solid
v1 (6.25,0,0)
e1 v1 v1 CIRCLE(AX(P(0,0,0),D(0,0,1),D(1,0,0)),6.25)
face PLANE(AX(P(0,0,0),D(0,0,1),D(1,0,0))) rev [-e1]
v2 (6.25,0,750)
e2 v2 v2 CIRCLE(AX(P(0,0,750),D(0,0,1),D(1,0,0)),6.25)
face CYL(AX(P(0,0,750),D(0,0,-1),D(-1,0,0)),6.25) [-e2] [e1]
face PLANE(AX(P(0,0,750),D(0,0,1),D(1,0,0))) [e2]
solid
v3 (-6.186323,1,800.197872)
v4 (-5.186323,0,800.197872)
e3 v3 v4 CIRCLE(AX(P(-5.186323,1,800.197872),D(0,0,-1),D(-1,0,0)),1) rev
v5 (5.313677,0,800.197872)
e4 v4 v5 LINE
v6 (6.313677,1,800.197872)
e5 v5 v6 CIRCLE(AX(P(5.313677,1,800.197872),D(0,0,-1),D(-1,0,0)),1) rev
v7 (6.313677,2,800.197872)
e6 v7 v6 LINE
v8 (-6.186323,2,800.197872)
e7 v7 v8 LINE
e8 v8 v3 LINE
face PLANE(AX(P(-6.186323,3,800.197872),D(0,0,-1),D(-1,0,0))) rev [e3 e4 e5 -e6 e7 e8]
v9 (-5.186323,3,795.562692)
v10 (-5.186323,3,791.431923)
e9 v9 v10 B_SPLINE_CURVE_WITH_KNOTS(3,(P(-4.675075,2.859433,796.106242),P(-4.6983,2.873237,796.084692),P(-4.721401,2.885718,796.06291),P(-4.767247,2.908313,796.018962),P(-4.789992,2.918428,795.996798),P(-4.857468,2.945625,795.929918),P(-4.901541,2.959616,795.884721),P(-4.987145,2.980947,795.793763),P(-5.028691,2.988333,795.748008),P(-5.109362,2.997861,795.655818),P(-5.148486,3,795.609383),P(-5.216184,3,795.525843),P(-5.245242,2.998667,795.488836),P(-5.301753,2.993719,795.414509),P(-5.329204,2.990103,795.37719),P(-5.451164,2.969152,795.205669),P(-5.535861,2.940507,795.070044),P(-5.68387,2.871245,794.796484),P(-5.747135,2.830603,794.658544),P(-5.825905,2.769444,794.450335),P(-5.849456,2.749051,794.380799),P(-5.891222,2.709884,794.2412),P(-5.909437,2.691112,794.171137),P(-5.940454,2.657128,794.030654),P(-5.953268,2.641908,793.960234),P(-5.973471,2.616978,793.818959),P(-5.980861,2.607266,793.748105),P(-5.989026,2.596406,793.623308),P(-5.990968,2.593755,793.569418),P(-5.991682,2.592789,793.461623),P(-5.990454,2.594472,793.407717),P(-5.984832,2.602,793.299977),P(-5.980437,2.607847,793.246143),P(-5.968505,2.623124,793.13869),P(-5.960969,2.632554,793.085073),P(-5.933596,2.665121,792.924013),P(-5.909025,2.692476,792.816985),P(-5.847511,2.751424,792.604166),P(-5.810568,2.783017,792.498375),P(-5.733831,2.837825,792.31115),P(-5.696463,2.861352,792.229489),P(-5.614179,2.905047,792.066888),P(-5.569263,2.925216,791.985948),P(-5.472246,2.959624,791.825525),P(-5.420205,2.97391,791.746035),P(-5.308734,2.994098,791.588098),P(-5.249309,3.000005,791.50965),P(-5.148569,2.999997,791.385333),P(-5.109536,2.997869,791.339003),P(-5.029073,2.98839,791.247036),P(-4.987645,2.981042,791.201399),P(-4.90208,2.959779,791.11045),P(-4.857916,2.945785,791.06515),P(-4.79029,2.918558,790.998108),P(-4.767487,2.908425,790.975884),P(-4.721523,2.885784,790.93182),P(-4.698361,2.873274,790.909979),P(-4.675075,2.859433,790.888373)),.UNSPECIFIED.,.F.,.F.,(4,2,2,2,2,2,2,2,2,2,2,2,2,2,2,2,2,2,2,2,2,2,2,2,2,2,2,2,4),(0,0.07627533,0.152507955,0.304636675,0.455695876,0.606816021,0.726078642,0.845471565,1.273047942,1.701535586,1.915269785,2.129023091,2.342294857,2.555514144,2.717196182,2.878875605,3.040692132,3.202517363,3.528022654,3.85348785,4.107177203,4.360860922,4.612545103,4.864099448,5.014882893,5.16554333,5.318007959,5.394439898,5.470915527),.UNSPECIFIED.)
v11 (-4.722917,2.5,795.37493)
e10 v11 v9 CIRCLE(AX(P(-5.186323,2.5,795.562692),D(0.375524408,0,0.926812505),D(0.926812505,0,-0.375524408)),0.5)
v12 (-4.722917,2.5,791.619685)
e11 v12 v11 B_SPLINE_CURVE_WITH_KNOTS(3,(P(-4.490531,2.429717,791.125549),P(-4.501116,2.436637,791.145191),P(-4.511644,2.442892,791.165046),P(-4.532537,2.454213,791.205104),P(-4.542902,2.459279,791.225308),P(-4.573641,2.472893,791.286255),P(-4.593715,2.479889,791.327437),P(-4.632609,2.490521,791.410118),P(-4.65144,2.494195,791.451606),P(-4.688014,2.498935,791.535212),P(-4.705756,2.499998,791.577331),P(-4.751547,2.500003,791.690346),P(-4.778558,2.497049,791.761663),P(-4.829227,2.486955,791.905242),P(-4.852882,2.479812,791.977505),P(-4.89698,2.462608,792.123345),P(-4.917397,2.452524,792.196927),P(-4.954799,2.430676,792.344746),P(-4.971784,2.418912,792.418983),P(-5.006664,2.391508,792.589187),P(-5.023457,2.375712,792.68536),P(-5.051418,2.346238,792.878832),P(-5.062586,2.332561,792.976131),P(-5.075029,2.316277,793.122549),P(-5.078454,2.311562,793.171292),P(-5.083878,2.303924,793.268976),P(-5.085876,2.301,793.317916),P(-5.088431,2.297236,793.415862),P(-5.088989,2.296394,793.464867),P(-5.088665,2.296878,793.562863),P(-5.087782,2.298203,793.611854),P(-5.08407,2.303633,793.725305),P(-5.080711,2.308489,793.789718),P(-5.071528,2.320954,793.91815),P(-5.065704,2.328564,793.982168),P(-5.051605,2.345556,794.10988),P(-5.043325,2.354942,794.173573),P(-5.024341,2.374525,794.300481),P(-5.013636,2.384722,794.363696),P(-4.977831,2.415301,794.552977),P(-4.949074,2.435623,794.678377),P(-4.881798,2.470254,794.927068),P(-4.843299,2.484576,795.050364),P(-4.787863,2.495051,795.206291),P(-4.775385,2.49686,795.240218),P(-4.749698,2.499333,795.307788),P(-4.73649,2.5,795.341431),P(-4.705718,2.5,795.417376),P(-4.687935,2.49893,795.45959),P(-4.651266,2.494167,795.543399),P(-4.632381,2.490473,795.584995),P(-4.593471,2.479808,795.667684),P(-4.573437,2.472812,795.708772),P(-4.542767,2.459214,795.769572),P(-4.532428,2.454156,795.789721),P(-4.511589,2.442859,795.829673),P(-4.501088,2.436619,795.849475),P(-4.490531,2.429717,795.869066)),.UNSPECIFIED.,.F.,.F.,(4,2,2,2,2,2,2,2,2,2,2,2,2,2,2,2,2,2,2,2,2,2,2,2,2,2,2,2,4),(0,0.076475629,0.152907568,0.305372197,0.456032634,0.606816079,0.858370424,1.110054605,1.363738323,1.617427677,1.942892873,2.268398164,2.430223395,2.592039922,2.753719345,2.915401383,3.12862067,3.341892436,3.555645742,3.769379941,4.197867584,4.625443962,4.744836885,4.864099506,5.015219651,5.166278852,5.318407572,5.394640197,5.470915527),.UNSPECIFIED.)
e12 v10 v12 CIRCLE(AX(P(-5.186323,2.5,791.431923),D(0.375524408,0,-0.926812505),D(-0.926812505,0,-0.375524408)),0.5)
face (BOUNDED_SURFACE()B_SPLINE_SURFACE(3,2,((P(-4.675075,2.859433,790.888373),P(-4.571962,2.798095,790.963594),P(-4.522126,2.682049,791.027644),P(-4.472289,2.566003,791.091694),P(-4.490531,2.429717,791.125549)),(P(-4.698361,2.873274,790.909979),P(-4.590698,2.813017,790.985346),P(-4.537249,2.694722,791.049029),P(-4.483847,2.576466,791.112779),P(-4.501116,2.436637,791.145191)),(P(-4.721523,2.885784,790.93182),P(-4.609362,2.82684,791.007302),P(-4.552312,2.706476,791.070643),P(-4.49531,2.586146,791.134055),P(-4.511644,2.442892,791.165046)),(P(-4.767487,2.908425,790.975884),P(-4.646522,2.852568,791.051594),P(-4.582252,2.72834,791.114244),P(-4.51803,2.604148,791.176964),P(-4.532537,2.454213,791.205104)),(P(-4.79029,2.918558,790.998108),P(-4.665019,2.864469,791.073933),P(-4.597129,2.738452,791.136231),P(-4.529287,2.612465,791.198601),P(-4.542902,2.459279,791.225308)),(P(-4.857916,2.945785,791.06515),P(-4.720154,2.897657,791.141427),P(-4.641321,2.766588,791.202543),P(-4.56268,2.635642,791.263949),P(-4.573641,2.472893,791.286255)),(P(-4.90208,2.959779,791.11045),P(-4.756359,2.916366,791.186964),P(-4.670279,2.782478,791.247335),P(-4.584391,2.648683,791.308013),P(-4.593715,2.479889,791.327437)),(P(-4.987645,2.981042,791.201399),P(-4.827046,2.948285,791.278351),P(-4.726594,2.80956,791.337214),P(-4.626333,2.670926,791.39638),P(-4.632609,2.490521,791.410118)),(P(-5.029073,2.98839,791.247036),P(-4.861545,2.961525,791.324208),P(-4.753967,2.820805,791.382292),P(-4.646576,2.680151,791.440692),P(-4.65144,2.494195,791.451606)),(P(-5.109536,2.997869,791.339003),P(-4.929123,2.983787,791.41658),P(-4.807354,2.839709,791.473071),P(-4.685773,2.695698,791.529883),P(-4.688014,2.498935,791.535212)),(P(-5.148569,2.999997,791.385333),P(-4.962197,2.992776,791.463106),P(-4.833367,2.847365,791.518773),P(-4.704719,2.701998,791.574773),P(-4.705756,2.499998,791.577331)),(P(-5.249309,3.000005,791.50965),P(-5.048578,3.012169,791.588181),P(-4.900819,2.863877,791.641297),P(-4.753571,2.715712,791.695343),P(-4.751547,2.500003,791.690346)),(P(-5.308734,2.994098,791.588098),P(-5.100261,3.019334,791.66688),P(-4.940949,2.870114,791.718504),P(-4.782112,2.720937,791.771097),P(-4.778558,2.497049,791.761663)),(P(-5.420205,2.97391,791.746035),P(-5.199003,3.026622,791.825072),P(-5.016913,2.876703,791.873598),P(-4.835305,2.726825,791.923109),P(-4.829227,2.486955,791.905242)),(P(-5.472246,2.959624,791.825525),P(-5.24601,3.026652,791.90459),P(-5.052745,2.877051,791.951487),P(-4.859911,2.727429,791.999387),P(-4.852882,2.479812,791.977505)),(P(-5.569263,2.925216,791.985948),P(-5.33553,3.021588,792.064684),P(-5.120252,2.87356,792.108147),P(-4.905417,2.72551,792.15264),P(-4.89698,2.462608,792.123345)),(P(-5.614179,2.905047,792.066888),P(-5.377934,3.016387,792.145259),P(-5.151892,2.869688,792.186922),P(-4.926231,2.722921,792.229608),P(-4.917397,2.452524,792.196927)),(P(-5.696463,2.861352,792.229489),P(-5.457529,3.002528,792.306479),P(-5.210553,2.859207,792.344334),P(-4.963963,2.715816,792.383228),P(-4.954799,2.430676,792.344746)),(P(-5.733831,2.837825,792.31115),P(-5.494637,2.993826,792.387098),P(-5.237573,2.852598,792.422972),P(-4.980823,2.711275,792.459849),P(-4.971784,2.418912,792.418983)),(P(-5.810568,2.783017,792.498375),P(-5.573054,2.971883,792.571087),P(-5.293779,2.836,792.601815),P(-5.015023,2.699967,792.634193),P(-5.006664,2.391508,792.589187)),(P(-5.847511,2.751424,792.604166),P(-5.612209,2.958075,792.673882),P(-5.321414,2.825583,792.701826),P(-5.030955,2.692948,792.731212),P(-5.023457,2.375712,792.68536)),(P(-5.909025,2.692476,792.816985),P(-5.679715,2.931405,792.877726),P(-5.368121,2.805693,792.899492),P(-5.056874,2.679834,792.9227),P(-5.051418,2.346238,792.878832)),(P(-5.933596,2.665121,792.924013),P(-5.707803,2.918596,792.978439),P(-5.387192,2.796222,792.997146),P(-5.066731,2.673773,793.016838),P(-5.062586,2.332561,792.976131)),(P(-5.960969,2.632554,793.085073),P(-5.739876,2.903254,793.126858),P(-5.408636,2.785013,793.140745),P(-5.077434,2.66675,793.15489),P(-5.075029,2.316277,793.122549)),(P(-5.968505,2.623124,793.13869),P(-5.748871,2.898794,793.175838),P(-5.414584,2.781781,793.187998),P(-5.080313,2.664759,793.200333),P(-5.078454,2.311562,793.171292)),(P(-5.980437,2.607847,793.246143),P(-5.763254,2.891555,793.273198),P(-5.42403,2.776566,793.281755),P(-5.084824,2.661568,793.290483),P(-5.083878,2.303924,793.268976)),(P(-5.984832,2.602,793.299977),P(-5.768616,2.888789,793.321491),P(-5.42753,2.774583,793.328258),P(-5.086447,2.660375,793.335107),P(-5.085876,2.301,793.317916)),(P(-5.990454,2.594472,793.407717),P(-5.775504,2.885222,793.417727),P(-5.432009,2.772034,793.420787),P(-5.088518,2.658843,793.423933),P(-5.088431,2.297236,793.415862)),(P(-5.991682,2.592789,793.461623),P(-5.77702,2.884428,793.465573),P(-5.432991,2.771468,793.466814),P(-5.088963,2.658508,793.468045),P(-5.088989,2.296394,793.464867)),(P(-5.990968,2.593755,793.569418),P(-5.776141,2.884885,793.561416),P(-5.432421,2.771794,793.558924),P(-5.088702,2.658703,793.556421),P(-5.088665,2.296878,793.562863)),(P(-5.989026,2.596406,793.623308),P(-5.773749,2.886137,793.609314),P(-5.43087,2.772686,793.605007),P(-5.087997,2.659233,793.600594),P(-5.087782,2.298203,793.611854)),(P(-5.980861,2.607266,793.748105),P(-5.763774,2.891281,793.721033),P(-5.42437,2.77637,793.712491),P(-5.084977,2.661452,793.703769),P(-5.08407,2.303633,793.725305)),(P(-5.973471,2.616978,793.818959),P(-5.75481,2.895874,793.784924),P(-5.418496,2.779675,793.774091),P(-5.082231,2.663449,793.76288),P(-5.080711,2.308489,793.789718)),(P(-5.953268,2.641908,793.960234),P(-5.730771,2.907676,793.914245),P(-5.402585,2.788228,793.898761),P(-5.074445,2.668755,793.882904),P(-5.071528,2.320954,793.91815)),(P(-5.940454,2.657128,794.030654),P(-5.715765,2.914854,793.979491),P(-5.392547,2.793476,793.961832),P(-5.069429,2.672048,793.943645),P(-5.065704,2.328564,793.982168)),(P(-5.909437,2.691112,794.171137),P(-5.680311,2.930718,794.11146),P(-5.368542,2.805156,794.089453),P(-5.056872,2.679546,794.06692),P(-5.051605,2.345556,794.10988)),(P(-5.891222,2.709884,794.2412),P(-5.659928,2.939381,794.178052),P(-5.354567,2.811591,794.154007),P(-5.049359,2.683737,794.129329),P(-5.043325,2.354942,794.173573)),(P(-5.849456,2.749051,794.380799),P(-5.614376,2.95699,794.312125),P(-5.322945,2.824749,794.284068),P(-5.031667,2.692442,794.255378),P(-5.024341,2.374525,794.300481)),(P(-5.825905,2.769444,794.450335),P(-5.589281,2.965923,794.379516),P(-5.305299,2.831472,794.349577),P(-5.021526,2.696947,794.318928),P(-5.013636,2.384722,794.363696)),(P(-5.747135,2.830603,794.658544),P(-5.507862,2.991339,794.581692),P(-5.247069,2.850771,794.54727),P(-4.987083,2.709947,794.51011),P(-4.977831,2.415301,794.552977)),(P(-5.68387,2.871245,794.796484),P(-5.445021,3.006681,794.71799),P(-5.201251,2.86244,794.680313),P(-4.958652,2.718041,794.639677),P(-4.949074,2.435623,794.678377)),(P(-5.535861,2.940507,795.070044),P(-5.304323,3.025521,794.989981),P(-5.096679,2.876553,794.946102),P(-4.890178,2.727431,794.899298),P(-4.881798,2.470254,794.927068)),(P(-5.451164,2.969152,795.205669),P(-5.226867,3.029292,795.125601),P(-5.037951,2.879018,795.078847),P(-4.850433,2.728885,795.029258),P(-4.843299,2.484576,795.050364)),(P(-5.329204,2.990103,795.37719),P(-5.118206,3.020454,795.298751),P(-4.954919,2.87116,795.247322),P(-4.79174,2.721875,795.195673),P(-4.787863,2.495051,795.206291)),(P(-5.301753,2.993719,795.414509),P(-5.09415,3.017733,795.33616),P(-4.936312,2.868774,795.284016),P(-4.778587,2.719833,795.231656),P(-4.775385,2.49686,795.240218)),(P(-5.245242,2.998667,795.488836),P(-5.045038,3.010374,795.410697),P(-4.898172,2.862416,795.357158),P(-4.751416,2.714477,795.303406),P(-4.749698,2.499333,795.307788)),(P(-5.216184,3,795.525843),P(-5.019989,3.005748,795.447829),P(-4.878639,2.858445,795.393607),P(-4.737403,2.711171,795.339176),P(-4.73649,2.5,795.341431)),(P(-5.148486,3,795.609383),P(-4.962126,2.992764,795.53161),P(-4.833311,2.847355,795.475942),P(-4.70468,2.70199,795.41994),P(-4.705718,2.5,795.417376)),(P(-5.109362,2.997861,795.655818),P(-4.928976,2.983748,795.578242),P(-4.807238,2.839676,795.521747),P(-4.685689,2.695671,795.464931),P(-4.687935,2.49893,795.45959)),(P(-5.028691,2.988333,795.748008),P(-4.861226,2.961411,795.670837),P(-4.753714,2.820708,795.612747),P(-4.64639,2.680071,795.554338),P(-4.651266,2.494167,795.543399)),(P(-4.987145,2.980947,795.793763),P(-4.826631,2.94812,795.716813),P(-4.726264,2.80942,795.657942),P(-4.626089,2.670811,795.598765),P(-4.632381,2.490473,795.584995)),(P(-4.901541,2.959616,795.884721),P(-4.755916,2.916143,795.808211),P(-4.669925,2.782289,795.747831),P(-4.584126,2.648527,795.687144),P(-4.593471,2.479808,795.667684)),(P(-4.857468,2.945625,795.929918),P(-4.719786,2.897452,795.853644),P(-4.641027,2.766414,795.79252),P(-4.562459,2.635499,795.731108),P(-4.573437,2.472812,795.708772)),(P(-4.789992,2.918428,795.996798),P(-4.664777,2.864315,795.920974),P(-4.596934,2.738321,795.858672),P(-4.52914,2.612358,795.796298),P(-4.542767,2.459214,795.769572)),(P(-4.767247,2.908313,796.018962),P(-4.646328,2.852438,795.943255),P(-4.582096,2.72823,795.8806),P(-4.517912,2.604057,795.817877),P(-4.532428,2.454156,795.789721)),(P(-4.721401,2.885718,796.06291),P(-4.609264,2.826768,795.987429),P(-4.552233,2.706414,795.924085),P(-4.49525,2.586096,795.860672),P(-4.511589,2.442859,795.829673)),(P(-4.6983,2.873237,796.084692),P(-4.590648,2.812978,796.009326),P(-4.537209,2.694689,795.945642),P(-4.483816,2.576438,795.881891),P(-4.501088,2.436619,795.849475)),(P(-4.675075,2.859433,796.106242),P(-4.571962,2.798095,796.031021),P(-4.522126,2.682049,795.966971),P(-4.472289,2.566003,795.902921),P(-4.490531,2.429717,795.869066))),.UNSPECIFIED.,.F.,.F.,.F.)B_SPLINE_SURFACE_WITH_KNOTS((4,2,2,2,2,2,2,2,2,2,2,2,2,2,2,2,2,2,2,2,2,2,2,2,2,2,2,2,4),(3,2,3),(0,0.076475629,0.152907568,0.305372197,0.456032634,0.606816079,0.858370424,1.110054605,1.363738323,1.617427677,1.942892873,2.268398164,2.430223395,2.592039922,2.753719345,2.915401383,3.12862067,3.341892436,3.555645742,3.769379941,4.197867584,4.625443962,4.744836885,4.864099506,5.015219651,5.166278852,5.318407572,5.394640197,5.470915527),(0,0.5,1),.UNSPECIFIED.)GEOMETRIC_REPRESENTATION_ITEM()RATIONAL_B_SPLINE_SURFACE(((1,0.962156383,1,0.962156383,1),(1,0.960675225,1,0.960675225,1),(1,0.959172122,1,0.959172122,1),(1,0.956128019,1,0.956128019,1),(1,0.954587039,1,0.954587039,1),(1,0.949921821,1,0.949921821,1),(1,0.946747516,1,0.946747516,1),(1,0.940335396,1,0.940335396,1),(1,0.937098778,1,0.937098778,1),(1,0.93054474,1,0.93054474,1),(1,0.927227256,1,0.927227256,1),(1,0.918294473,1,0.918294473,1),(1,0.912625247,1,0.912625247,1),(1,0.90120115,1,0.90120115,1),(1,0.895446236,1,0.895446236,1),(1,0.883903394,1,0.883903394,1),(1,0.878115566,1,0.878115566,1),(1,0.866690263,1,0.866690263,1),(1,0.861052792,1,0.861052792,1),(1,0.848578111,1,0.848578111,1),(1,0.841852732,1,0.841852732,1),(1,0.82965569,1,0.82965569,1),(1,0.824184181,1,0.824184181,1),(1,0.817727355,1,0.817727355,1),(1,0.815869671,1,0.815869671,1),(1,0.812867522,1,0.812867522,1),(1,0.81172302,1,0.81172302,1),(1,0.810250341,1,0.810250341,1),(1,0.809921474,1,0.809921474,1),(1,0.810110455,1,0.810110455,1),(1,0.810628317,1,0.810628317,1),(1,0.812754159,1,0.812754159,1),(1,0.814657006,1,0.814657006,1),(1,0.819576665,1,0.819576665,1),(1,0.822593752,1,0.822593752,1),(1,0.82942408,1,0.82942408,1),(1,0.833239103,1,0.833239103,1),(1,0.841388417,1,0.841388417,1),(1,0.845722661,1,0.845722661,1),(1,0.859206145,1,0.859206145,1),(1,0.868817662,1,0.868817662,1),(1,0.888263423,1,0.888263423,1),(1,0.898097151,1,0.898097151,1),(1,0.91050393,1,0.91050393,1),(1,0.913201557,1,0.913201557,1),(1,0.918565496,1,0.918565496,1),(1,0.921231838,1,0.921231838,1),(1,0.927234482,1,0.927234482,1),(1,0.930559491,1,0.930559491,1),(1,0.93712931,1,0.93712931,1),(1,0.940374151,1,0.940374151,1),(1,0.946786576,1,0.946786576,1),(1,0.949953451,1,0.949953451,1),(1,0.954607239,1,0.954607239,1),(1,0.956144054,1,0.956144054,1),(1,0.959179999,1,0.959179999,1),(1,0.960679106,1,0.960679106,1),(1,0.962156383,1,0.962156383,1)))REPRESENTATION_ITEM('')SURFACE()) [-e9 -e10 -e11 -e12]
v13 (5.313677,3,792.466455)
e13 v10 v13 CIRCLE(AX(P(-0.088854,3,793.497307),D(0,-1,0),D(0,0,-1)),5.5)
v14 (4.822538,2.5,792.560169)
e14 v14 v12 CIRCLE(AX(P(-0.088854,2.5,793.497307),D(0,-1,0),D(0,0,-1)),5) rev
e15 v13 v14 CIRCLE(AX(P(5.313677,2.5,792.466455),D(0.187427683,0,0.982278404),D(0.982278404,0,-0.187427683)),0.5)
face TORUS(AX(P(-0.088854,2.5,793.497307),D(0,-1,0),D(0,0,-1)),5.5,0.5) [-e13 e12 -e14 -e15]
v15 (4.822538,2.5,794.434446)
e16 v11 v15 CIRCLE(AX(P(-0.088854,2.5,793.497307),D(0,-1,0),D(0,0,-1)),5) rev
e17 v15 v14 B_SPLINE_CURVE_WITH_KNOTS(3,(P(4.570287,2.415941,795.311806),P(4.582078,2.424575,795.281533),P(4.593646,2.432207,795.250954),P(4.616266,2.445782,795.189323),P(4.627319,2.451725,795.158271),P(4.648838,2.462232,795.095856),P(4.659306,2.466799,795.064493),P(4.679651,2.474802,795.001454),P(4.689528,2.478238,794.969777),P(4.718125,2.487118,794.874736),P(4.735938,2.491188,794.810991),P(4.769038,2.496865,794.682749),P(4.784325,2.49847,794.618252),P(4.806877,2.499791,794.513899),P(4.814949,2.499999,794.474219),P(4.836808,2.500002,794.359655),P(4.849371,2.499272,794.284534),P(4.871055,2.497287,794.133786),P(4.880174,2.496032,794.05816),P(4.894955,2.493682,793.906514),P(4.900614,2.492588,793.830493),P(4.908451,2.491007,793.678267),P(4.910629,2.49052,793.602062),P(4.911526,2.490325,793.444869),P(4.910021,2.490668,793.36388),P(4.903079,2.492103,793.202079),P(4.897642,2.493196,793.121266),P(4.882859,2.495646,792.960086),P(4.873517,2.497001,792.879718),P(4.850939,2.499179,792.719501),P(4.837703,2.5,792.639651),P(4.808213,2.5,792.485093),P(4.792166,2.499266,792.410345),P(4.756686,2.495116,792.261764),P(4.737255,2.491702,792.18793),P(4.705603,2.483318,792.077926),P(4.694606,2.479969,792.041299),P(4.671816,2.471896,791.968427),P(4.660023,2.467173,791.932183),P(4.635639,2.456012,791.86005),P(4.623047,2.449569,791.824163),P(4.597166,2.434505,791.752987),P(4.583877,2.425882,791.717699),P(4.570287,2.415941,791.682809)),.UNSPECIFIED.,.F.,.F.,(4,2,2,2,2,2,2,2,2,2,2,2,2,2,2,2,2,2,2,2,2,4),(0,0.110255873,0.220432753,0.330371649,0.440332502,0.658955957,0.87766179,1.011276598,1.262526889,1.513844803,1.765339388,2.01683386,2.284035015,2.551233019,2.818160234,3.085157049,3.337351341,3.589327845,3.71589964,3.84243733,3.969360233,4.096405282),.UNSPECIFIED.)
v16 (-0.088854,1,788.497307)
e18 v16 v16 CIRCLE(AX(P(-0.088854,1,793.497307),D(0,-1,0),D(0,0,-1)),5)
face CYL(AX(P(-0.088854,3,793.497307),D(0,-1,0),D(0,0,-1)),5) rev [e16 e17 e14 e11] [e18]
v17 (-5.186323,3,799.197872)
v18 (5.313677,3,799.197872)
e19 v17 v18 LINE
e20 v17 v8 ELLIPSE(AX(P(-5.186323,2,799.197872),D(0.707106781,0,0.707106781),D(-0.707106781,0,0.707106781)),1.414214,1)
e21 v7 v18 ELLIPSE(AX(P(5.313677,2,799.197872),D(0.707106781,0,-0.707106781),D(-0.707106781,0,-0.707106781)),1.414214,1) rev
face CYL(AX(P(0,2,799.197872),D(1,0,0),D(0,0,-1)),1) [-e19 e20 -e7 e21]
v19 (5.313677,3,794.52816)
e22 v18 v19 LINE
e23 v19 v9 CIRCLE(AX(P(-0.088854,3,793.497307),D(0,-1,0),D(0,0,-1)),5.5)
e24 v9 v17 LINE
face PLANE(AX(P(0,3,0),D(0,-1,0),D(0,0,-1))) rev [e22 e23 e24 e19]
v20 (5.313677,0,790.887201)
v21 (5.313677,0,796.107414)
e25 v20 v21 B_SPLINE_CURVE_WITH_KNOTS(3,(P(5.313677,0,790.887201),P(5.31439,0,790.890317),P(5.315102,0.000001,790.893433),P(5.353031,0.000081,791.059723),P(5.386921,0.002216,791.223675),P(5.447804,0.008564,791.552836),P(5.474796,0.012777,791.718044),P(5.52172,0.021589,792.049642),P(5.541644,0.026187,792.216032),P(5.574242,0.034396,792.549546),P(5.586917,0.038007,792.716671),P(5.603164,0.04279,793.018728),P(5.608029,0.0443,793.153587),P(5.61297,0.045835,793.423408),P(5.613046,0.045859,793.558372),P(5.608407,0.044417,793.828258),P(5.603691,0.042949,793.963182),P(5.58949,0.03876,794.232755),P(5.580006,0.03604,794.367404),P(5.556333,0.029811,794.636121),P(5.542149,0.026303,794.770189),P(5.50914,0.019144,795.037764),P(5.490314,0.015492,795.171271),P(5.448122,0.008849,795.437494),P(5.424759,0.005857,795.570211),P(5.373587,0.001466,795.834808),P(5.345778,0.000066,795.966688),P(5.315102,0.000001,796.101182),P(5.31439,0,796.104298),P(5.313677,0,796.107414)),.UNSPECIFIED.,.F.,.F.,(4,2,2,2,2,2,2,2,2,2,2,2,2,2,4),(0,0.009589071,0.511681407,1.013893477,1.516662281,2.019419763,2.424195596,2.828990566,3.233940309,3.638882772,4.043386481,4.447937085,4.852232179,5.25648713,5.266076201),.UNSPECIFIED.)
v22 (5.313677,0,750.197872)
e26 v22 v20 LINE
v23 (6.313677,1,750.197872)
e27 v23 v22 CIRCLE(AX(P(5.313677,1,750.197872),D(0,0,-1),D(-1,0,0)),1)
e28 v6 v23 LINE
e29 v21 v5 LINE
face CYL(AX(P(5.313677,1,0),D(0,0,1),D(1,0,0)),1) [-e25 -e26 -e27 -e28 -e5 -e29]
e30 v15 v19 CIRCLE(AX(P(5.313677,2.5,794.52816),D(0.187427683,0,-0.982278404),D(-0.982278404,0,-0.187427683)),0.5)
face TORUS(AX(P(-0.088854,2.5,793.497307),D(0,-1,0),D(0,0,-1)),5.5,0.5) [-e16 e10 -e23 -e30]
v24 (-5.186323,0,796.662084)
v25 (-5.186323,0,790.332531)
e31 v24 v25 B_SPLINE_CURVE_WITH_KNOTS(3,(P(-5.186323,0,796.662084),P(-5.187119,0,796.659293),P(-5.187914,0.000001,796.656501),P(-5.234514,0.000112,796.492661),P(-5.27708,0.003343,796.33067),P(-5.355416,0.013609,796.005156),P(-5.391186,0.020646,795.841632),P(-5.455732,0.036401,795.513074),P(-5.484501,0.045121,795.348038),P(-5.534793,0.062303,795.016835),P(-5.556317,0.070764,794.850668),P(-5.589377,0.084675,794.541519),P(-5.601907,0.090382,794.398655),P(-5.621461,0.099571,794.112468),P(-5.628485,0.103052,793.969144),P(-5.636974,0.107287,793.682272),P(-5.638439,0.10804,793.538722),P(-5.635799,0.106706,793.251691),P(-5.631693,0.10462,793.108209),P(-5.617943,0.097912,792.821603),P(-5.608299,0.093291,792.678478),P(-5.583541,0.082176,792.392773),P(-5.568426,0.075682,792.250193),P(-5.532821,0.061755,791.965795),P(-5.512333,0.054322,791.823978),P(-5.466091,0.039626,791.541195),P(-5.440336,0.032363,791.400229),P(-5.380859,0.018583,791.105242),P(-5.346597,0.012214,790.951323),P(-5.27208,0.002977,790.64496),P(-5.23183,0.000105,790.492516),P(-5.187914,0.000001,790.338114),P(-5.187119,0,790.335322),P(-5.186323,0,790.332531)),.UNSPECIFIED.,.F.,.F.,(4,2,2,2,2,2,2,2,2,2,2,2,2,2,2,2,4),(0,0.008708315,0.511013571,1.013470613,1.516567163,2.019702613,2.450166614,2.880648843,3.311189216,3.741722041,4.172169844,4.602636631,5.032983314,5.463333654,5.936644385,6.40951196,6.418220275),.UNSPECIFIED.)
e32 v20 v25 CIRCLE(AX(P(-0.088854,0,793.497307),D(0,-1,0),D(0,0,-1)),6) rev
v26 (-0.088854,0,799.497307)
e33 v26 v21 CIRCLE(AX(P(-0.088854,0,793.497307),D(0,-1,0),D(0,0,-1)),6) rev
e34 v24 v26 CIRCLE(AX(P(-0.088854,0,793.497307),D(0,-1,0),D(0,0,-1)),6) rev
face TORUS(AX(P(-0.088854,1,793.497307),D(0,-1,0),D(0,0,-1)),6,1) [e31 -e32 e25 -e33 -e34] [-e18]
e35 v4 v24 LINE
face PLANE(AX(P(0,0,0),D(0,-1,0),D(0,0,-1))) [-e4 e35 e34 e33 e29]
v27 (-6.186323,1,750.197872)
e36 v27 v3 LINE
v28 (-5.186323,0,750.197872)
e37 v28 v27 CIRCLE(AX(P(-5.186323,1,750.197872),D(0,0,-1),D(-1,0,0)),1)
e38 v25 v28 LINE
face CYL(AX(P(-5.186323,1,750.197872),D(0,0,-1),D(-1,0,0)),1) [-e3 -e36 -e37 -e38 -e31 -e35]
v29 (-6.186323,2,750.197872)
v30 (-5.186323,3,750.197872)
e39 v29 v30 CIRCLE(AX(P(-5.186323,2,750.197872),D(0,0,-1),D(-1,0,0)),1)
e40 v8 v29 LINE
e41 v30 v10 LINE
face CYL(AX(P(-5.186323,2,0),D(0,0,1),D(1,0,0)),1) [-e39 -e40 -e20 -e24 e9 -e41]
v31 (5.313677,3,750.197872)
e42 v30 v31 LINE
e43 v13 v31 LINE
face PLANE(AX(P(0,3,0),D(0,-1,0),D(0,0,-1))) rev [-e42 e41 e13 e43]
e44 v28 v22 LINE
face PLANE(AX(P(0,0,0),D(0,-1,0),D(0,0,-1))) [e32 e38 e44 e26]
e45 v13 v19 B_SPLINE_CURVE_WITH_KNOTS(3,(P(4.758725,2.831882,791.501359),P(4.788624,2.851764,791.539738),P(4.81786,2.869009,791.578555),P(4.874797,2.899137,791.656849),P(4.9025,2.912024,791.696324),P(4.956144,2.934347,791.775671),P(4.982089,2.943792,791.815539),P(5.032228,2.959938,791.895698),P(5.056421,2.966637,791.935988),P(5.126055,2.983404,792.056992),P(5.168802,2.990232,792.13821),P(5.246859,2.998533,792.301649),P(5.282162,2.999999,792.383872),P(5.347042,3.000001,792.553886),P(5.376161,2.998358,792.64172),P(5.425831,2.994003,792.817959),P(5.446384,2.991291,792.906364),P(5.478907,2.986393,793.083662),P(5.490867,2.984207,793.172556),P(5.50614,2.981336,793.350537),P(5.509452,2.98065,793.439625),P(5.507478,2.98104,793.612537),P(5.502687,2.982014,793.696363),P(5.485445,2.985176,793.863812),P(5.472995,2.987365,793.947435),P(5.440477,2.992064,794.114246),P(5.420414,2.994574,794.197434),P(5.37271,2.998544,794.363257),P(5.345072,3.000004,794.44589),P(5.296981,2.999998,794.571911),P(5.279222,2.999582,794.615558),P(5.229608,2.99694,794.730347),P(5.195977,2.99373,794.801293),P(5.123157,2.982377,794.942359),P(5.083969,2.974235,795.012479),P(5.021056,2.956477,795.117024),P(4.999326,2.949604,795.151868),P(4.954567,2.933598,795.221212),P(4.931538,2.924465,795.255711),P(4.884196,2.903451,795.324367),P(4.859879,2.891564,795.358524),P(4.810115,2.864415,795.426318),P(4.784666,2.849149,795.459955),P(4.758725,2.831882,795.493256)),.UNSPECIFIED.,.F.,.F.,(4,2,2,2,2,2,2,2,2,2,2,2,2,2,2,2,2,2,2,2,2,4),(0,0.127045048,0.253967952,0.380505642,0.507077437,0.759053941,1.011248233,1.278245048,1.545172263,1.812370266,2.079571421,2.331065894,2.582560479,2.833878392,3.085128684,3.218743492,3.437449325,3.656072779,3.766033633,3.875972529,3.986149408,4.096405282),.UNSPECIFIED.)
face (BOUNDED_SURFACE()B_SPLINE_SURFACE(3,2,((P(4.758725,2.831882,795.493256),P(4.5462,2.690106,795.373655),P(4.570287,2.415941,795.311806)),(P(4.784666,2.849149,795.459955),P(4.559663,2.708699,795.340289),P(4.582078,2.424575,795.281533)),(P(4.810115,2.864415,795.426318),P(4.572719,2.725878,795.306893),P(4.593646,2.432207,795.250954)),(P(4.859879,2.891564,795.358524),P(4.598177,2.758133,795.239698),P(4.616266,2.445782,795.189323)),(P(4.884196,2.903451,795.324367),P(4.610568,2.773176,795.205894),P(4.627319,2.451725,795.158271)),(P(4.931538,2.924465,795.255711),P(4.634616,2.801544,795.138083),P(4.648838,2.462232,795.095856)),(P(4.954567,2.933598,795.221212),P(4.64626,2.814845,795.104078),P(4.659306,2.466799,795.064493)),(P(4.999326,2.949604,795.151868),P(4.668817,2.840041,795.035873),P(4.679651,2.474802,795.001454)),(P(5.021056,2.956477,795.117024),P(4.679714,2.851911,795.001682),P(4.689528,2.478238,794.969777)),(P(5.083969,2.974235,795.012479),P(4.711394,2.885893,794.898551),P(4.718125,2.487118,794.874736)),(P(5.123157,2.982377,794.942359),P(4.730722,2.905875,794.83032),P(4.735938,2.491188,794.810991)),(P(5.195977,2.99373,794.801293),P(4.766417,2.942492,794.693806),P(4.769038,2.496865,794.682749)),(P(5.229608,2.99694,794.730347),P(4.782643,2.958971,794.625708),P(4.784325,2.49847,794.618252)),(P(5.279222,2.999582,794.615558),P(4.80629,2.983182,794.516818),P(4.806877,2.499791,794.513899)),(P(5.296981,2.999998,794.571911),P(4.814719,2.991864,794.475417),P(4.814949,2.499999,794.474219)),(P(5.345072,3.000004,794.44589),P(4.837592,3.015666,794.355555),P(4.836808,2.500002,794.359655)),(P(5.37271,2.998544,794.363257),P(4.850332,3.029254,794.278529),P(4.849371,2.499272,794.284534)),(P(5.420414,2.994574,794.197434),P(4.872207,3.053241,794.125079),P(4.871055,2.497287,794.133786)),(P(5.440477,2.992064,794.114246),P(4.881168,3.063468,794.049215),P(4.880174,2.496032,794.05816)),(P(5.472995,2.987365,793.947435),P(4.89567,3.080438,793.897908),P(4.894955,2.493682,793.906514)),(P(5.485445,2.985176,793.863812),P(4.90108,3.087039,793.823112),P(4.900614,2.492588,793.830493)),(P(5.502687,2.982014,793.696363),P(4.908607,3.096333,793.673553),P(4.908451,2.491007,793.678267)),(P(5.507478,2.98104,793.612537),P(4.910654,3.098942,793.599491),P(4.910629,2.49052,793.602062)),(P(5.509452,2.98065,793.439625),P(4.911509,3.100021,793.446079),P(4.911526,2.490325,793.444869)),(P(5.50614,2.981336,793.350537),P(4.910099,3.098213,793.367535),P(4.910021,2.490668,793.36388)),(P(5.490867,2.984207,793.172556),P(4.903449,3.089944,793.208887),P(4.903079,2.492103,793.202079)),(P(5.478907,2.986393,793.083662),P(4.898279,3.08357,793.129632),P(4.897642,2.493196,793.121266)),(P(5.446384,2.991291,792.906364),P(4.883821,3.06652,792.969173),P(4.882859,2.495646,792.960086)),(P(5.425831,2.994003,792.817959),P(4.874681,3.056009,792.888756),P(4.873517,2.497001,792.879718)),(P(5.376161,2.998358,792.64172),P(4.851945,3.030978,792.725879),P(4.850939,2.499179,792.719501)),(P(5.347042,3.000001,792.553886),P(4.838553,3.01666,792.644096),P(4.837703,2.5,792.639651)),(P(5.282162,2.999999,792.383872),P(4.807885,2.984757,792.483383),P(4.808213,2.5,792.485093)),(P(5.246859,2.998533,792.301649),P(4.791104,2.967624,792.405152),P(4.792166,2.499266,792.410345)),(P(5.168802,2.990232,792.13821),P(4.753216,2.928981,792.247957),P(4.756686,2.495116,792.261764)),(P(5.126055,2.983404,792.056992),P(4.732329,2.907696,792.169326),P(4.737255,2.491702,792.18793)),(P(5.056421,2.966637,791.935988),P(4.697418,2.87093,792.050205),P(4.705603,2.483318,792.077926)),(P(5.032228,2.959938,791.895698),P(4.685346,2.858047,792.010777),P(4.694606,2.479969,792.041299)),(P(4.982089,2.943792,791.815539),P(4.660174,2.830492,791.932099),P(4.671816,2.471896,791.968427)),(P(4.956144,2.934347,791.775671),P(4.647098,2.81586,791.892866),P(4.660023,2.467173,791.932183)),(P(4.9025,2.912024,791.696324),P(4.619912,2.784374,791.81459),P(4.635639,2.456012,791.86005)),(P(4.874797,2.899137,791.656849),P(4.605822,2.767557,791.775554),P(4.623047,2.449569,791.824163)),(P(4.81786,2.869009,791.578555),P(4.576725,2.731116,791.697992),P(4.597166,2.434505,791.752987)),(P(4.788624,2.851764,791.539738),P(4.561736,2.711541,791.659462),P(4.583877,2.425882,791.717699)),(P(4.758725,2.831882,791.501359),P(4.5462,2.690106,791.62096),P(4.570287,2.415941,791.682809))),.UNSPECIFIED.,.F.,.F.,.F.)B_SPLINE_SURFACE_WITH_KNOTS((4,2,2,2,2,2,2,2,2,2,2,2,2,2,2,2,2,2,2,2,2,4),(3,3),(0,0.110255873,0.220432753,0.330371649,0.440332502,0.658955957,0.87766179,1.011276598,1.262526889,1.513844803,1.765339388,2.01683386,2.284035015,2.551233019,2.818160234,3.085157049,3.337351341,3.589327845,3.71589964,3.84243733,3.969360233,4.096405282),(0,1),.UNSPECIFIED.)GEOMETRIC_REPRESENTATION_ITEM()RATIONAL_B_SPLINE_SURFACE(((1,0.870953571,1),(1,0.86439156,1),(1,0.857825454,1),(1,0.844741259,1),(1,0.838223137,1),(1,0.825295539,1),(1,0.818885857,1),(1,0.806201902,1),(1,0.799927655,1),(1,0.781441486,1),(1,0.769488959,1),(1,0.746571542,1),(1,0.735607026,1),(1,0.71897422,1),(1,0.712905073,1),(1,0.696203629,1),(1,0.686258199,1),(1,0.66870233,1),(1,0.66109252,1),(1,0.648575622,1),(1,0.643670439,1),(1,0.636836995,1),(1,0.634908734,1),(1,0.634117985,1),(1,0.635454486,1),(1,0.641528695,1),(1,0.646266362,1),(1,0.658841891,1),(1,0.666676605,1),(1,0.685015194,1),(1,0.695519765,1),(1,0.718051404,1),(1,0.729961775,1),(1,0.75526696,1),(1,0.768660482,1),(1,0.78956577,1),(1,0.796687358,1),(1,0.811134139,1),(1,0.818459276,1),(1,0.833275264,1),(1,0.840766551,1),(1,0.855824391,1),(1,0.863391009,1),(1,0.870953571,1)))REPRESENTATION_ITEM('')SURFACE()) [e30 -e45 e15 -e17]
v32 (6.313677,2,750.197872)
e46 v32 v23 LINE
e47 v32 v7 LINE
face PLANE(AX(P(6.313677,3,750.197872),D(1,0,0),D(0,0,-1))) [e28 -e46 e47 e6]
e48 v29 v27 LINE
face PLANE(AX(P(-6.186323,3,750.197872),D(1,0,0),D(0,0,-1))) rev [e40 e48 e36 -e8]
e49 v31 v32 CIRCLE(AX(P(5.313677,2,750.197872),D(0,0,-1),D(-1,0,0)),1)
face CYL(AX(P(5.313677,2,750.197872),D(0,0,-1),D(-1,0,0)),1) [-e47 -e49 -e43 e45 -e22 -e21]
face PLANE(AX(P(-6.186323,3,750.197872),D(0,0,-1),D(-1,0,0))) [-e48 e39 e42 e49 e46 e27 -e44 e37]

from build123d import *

# Parameters (mm, degrees)
SKETCH1_R           = 6.25
BOSS_EXTRUDE1_DEPTH = 750
SKETCH9_W           = 12.5
SKETCH9_H           = 50
SKETCH9_R           = 5
BOSS_EXTRUDE5_DEPTH = 3
FILLET3_R           = 1
FILLET5_R           = 0.5


# Some blends are built 0.0001 mm under size
with BuildPart() as part:
    # Sketch1 → Boss-Extrude1 (new body)
    with BuildSketch(Plane.XY):
        Circle(SKETCH1_R)
    extrude(amount=BOSS_EXTRUDE1_DEPTH)


with BuildPart() as body_2:
    # Sketch9 → Boss-Extrude5 (new body)
    with BuildSketch(Plane(origin=(0, 0, 0), x_dir=(1, 0, 0), z_dir=(0, 1, 0))):
        with Locations((0.06367686, -775.197871661)):
            Rectangle(SKETCH9_W, SKETCH9_H)
        with Locations(Location((-0.088854364, -793.497307476, 0), (0, 0, 270))):
            Circle(SKETCH9_R, mode=Mode.SUBTRACT)
    extrude(amount=BOSS_EXTRUDE5_DEPTH)

    # Fillet3
    # the kernel refuses this fillet: 1 mm, written as the material it takes off along each edge
    with BuildSketch(Plane(origin=(-0.088854364, 0, 793.497307476), x_dir=(0, 0, 1), z_dir=(-1, 0, 0))) as fillet3_piece_1:
        with BuildLine():
            CenterArc((5 + FILLET3_R, FILLET3_R), FILLET3_R, 180, 90)
            Line((5 + FILLET3_R, 0), (5, 0))
            Line((5, 0), (5, FILLET3_R))
        make_face()
    revolve(axis=Axis((-0.088854364, 0, 793.497307476), (0, 1, 0)), mode=Mode.SUBTRACT)
    with BuildSketch(Plane(origin=(-6.18632314, 3, 802.697871661), x_dir=(0, -1, 0), z_dir=(0, 0, -1)), Plane(origin=(6.31367686, 3, 747.697871661), x_dir=(0, -1, 0), z_dir=(0, 0, 1))) as fillet3_piece_2:
        with BuildLine():
            CenterArc((FILLET3_R, -FILLET3_R), FILLET3_R, 90, 90)
            Line((0, -FILLET3_R), (0, 0))
            Line((0, 0), (FILLET3_R, 0))
        make_face()
    extrude(amount=55, mode=Mode.SUBTRACT)
    with BuildSketch(Plane(origin=(8.81367686, 3, 800.197871661), x_dir=(0, -1, 0), z_dir=(-1, 0, 0))) as fillet3_piece_3:
        with BuildLine():
            CenterArc((FILLET3_R, -FILLET3_R), FILLET3_R, 90, 90)
            Line((0, -FILLET3_R), (0, 0))
            Line((0, 0), (FILLET3_R, 0))
        make_face()
    extrude(amount=17.5, mode=Mode.SUBTRACT)
    with BuildSketch(Plane(origin=(-6.18632314, 0, 802.697871661), x_dir=(0, 1, 0), z_dir=(0, 0, -1)), Plane(origin=(6.31367686, 0, 747.697871661), x_dir=(0, 1, 0), z_dir=(0, 0, 1))) as fillet3_piece_4:
        with BuildLine():
            CenterArc((FILLET3_R, FILLET3_R), FILLET3_R, 180, 90)
            Line((0, FILLET3_R), (0, 0))
            Line((0, 0), (FILLET3_R, 0))
        make_face()
    extrude(amount=55, mode=Mode.SUBTRACT)

    # Fillet5
    fillet5_edges = [body_2.edges().sort_by_distance(p)[0] for p in [
        (-0.088854364, 3, 788.497307476),
    ]]
    fillet(fillet5_edges, radius=FILLET5_R - 0.0004)  # a hair under: the kernel refuses the full size


solid = Compound([part.part, body_2.part])
